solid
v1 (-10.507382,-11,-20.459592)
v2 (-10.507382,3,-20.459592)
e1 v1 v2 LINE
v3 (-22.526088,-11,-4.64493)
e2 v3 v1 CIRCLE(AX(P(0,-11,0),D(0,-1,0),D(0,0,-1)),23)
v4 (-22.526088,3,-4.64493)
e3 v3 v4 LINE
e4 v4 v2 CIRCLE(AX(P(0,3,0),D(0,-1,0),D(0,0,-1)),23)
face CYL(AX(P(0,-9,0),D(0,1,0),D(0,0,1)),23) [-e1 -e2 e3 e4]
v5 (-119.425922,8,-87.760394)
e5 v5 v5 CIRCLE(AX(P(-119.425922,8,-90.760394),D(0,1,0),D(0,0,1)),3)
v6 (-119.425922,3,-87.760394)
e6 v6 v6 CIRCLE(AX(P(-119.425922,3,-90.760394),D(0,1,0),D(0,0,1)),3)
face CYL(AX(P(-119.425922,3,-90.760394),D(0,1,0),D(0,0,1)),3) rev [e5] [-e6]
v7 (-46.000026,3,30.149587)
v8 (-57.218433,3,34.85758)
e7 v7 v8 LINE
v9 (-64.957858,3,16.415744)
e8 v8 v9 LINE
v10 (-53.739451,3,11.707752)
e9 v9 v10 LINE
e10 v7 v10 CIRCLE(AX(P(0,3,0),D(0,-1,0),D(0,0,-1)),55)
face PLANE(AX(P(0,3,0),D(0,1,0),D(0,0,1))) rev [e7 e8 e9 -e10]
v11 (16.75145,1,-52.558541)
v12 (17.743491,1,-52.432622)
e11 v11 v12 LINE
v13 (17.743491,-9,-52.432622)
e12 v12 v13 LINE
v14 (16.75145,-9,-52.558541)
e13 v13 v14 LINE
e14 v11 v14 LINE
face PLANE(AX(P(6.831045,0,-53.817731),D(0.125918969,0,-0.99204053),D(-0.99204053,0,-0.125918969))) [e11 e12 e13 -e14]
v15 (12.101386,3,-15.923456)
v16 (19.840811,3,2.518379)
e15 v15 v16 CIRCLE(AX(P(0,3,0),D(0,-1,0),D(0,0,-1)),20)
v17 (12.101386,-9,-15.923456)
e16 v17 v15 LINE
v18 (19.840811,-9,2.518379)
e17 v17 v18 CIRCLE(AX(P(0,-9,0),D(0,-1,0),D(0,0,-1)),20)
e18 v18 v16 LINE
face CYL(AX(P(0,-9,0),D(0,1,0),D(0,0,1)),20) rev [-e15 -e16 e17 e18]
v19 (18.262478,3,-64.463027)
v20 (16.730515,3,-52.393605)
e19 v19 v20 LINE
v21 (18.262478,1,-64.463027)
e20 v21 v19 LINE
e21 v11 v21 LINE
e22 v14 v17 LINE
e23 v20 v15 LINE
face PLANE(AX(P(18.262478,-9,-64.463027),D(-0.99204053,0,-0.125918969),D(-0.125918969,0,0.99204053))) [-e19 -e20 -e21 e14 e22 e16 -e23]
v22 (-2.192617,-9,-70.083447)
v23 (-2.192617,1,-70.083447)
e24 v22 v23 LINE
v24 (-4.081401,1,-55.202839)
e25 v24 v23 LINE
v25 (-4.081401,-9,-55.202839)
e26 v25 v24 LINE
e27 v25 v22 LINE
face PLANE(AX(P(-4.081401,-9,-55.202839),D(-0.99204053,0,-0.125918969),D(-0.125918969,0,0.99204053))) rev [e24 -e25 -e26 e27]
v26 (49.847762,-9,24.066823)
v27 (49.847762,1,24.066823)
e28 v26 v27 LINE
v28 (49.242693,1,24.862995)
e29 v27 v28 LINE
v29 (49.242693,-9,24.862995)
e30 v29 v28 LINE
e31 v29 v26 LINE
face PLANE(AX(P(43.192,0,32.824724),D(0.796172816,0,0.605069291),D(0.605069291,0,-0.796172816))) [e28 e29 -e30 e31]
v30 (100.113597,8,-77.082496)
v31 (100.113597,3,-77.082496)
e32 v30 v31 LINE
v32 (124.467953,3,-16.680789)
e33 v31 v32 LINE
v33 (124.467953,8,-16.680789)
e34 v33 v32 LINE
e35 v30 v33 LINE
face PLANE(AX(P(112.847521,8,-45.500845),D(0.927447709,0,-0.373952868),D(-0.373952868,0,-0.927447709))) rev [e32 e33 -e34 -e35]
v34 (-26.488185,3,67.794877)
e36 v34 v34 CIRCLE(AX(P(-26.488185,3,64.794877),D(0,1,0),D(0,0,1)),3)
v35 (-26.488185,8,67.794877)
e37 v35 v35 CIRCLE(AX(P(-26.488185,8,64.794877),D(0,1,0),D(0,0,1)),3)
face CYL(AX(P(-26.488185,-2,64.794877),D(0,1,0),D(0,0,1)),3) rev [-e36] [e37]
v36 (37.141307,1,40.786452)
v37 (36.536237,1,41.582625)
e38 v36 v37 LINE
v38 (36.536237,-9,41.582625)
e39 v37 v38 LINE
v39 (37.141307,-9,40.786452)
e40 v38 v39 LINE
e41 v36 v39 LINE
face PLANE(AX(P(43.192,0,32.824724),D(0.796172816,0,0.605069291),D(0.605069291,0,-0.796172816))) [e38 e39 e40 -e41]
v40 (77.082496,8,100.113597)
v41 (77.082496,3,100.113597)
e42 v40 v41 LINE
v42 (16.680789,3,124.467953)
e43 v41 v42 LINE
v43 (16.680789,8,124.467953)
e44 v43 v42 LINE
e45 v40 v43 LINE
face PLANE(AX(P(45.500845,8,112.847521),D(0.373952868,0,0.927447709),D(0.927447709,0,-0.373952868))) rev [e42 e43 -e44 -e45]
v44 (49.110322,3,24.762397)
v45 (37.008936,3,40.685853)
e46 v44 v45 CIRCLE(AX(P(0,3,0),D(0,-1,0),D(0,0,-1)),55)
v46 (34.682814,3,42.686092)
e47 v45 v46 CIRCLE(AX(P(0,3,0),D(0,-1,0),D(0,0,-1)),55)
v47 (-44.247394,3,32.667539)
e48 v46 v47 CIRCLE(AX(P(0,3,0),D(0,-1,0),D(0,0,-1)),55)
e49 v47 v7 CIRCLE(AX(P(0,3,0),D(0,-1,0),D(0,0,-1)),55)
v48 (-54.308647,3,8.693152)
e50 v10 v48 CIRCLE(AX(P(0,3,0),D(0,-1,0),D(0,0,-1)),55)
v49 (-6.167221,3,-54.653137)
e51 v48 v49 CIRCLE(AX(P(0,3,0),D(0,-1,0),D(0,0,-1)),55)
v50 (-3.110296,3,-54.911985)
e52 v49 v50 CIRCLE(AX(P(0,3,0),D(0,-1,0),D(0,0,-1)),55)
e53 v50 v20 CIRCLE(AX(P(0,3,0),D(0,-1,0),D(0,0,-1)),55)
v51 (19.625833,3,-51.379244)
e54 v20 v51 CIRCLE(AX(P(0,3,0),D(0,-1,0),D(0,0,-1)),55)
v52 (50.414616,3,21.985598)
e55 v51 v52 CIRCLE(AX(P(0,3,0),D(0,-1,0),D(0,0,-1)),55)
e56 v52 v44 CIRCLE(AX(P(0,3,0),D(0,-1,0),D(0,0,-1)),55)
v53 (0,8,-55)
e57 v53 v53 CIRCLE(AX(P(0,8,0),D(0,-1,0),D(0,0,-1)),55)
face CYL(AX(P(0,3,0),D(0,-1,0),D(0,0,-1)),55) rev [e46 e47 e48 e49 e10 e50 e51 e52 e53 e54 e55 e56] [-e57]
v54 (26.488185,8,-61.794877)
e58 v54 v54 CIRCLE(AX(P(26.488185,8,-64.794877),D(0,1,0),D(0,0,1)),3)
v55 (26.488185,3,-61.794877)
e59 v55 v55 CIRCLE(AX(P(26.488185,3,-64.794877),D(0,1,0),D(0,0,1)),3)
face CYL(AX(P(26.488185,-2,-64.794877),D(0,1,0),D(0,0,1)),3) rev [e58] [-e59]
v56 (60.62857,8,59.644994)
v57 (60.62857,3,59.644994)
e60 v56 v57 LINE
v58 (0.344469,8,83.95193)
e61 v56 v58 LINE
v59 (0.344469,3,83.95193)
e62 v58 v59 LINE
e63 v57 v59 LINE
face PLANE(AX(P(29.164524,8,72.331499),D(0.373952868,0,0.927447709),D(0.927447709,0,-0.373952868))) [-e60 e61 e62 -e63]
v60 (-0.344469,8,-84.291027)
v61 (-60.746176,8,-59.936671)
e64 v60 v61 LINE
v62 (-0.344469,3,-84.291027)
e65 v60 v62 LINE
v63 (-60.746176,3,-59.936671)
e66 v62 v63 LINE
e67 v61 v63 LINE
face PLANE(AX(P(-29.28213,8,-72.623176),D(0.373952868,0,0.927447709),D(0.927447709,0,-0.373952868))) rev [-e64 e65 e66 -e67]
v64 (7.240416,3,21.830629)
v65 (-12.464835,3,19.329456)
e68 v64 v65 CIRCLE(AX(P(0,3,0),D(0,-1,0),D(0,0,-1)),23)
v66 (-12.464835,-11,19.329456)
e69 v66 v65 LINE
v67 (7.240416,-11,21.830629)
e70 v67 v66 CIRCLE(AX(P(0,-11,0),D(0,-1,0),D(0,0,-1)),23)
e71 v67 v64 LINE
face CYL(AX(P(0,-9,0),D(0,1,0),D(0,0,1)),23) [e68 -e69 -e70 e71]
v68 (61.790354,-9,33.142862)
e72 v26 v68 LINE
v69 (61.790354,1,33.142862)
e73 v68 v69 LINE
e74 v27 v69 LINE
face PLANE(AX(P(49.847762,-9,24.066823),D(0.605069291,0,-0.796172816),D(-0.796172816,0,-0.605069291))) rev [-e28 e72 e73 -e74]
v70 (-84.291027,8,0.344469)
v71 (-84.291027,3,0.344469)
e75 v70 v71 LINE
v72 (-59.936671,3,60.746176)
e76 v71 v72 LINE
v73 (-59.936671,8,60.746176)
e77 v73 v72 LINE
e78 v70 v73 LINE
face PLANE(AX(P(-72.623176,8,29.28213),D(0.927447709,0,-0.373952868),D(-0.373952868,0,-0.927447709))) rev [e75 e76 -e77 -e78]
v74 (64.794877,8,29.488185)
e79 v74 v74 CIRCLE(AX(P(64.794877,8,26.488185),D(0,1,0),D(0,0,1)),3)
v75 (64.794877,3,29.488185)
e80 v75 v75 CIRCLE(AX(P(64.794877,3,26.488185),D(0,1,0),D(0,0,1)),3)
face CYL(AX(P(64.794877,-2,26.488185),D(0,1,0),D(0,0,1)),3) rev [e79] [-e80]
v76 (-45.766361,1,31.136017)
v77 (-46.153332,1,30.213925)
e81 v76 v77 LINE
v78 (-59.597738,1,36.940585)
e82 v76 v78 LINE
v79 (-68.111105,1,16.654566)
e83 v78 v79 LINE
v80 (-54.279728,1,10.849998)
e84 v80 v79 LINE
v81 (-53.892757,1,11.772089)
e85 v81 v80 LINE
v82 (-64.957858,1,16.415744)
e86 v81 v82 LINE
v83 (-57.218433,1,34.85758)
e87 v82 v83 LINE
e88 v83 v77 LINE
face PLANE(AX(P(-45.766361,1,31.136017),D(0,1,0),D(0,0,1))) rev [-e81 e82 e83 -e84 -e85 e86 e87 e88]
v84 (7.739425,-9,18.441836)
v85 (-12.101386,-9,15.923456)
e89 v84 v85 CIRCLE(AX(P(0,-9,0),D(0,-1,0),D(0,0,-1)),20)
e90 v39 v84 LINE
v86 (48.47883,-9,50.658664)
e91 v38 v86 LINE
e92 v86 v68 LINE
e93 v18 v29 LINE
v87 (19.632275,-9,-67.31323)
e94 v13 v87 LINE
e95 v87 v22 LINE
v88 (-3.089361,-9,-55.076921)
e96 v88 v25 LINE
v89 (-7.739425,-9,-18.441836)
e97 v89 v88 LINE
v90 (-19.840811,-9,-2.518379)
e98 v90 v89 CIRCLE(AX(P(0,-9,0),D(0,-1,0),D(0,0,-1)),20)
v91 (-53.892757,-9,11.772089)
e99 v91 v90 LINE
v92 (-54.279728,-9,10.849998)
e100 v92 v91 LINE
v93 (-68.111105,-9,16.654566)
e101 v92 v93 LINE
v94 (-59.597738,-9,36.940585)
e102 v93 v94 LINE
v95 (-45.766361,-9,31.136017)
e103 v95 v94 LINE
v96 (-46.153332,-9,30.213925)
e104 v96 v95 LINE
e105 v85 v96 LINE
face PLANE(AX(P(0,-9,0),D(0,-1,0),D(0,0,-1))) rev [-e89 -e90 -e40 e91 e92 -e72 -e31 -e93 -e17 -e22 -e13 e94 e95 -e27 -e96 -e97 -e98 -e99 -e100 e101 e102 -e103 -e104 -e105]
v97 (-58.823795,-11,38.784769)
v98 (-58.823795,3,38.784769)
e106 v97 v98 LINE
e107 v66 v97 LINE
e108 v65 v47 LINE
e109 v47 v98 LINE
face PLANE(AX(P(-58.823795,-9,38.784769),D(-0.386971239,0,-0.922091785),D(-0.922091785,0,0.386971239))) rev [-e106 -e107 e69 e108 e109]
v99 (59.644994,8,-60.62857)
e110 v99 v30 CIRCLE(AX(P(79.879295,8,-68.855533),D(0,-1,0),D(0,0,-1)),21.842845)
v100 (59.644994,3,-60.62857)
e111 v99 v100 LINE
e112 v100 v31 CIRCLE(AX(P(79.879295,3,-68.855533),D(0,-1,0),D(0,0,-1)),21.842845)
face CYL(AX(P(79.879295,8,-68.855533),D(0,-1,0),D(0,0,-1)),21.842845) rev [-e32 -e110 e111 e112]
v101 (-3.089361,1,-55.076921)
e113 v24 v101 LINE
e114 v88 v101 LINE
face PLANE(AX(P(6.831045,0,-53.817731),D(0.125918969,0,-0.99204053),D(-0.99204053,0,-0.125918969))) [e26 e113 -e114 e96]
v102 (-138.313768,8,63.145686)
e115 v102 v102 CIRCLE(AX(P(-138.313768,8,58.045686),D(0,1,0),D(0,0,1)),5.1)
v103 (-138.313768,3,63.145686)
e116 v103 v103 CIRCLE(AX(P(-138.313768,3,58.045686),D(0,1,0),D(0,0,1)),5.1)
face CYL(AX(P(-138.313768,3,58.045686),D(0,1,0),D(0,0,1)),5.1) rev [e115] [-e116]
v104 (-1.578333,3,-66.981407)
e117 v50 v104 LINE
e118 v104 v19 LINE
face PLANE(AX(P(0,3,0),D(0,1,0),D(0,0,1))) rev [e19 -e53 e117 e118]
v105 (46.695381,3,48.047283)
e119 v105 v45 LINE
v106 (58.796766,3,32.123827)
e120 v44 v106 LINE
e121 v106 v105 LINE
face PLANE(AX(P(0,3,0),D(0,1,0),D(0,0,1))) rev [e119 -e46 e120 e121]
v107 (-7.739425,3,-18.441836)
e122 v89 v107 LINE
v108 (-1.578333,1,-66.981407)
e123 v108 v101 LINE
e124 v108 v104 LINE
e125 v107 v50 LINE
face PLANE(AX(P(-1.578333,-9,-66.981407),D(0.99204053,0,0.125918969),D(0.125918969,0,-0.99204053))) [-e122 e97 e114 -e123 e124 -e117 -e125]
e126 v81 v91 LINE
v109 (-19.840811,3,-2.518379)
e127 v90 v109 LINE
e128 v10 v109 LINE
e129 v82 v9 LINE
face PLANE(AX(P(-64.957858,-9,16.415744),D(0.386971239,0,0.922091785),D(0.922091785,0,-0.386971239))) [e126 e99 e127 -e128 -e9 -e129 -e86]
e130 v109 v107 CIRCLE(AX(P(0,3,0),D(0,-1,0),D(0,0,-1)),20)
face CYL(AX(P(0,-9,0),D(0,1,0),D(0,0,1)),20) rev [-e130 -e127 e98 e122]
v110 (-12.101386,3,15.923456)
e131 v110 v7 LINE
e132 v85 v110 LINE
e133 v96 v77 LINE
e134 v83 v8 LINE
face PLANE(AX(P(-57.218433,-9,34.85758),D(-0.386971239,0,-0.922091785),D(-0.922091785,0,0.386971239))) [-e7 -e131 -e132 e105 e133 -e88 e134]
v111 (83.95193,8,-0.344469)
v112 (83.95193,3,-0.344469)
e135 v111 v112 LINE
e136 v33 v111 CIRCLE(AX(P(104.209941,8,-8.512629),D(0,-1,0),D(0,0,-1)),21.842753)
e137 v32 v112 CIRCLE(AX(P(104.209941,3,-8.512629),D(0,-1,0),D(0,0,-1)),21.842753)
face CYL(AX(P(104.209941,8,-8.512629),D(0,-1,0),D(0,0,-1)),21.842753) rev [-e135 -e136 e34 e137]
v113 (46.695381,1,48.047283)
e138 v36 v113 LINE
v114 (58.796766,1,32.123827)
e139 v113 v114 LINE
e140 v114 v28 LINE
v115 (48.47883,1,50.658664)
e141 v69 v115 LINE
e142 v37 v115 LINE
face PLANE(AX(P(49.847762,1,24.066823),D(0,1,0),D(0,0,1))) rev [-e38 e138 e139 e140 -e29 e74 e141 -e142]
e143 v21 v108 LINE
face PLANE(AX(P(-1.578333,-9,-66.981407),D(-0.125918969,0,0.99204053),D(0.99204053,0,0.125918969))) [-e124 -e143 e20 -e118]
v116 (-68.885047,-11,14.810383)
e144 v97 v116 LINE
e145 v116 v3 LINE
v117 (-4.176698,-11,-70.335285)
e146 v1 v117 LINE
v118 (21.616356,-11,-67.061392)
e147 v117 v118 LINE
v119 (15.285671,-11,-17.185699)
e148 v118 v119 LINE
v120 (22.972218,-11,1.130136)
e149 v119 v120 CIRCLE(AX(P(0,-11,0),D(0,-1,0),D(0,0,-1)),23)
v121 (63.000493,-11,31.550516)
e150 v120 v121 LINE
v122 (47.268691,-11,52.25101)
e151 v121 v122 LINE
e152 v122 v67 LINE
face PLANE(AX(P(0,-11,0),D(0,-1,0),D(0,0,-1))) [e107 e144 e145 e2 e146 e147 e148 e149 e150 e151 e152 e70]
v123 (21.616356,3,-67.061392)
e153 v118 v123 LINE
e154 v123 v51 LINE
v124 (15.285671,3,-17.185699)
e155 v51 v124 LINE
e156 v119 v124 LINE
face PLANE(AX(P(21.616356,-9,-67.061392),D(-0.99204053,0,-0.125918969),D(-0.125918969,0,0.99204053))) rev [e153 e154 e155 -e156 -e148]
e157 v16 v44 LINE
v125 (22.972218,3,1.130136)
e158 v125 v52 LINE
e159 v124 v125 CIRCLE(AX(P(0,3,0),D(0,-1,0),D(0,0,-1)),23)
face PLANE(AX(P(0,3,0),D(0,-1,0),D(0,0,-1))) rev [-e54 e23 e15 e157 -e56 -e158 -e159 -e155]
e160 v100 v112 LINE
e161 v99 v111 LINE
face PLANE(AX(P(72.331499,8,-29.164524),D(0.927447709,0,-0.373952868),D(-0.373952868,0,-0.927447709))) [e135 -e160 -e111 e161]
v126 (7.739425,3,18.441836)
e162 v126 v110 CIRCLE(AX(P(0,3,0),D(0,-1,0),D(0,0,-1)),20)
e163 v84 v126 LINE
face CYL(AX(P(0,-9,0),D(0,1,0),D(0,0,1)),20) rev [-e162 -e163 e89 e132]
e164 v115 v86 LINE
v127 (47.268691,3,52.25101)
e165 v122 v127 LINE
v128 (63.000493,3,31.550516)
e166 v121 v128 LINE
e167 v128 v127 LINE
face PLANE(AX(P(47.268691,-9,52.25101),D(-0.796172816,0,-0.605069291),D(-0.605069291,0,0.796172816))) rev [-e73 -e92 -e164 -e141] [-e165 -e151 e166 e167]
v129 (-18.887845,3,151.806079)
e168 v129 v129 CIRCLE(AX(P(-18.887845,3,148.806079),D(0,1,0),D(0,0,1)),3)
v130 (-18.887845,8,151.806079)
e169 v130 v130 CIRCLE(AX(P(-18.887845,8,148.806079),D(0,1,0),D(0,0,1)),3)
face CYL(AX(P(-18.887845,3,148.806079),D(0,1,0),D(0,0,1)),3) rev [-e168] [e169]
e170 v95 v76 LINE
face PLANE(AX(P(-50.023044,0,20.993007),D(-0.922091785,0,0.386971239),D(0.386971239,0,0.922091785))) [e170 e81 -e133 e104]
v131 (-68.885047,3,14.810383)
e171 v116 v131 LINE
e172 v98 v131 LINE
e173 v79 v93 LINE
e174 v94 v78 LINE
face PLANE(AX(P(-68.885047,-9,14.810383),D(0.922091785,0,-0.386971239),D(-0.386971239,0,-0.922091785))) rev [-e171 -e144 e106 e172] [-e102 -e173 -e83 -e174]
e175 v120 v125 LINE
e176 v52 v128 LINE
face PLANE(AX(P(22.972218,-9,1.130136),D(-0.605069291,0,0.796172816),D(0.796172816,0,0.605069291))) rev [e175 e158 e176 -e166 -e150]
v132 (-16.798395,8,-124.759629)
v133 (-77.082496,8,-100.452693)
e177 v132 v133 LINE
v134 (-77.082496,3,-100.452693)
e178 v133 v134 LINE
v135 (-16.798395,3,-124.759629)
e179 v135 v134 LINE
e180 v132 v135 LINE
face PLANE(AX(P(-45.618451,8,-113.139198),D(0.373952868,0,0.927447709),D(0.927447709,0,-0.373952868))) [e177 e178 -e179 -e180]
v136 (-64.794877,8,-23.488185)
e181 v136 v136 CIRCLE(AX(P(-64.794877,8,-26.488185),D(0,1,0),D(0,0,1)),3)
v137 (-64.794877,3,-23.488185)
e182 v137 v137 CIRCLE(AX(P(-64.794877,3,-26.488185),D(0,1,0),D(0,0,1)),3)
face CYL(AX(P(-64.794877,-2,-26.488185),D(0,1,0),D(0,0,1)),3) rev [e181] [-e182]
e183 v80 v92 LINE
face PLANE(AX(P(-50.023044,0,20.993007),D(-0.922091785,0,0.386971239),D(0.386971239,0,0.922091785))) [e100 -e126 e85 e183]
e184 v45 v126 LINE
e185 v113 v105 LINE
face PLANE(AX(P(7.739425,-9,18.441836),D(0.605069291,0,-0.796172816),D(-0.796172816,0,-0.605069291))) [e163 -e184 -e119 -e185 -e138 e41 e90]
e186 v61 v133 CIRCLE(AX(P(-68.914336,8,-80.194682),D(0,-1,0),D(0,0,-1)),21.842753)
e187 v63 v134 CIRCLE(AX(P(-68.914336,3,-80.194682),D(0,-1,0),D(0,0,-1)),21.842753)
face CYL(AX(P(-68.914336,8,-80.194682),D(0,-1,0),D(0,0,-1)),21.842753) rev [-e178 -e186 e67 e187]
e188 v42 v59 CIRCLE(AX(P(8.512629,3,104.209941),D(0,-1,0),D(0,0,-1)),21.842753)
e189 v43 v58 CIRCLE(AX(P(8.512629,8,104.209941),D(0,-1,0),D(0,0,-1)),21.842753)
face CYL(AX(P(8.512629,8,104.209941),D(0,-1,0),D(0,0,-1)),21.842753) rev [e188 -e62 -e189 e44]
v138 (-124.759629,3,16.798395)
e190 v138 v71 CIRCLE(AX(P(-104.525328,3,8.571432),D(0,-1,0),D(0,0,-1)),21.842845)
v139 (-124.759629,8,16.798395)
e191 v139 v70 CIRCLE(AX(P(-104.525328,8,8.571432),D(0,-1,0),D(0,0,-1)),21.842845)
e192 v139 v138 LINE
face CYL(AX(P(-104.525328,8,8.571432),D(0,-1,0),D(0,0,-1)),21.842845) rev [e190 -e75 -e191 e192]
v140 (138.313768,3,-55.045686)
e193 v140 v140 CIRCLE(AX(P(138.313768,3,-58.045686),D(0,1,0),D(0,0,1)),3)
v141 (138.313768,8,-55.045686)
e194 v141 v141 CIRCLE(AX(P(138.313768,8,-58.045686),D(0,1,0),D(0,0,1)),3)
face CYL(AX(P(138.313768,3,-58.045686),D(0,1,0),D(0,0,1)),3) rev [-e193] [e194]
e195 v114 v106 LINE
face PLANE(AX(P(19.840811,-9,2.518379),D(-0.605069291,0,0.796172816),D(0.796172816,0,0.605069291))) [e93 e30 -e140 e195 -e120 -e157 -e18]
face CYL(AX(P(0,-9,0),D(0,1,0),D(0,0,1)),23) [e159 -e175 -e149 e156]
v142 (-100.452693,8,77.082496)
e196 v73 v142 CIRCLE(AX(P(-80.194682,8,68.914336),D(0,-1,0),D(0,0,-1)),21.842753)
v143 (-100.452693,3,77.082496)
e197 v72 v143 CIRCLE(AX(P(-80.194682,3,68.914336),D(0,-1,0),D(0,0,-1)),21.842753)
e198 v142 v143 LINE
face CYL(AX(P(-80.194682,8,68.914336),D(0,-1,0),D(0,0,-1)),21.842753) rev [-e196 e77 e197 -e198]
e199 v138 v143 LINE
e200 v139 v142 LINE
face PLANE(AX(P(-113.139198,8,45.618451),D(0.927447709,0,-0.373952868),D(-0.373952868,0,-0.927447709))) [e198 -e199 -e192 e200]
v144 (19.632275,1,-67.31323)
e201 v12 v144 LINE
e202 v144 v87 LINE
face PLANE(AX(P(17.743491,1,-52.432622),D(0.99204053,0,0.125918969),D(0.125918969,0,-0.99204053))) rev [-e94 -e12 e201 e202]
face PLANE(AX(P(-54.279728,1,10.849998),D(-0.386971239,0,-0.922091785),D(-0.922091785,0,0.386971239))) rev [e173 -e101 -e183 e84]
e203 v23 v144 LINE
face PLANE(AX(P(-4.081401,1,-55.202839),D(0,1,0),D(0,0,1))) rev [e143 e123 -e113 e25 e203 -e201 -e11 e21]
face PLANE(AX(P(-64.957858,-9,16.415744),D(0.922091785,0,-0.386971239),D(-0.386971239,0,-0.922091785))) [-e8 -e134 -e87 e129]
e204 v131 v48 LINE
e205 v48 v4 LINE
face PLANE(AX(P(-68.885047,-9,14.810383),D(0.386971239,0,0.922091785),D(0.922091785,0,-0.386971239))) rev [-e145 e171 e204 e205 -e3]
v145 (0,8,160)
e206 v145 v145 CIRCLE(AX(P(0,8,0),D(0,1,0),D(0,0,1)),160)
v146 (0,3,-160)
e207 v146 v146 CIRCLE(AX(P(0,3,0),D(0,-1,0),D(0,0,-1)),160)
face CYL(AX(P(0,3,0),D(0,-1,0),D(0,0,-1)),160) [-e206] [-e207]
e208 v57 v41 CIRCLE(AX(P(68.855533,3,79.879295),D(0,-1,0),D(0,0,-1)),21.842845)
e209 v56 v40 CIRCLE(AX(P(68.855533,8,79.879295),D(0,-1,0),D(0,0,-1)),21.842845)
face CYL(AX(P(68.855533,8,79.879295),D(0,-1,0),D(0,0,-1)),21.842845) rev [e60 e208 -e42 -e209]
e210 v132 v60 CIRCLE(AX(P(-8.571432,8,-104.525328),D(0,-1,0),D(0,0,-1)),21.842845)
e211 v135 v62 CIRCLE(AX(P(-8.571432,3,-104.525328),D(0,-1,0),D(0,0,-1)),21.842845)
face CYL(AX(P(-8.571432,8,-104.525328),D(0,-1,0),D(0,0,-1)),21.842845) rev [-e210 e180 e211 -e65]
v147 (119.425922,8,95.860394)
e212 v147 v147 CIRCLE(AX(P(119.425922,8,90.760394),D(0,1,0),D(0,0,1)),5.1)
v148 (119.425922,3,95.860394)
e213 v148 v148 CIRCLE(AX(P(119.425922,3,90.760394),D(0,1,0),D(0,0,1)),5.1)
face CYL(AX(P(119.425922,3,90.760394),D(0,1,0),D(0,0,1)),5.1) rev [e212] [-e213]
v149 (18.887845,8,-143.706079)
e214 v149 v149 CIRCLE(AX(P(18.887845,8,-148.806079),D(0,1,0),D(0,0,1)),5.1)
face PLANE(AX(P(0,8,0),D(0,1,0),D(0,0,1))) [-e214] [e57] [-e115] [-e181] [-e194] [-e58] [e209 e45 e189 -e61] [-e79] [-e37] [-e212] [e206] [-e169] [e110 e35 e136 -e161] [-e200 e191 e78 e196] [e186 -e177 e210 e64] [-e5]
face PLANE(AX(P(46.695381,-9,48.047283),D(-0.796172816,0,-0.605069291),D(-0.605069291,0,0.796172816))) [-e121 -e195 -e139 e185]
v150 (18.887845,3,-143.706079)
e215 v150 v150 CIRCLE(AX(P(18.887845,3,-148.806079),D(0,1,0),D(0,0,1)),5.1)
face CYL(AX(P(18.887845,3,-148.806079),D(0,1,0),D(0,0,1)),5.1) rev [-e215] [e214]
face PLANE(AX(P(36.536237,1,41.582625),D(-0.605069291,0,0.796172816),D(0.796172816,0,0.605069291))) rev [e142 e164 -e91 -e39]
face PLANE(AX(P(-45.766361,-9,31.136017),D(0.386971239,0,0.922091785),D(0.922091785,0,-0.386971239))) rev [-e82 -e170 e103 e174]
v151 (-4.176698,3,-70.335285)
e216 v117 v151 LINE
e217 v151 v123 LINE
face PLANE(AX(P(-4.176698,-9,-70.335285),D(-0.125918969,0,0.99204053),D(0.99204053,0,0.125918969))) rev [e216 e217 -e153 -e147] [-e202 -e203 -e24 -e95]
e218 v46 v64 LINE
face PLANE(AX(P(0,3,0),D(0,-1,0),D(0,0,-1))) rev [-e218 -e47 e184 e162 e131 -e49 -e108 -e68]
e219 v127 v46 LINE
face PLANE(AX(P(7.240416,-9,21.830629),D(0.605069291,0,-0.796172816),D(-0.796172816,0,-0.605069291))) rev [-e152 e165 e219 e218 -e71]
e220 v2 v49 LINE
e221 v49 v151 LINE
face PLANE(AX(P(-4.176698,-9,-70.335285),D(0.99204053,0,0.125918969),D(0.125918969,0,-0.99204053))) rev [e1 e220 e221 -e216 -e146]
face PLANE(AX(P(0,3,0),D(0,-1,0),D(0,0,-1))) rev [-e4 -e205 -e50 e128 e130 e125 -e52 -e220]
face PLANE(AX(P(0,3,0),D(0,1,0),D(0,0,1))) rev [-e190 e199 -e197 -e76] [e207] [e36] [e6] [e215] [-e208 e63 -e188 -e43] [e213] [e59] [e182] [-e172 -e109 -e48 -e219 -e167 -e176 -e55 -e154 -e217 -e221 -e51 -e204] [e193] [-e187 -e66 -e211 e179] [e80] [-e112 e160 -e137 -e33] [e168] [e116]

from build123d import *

# Parameters (mm, degrees)
SKETCH1_R           = 160
SKETCH1_R_2         = 55
BOSS_EXTRUDE1_DEPTH = 3
SKETCH2_R           = 2.5
CUT_EXTRUDE1_DEPTH  = 5
CIRPATTERN1_COUNT   = 4
SKETCH3_R           = 5.1
CUT_EXTRUDE3_DEPTH  = 227.294056484
CIRPATTERN2_COUNT   = 3
CUT_EXTRUDE4_DEPTH  = 227.294056484
CIRPATTERN3_COUNT   = 4
SKETCH5_R           = 160
BOSS_EXTRUDE2_DEPTH = 5
SKETCH6_R           = 5.1
CUT_EXTRUDE5_DEPTH  = 5
SKETCH7_R           = 5.1
CUT_EXTRUDE6_DEPTH  = 5
SKETCH8_R           = 5.1
CUT_EXTRUDE7_DEPTH  = 5
CUT_EXTRUDE8_START  = -5
SKETCH9_R           = 2.5
CUT_EXTRUDE8_DEPTH  = 5
CUT_EXTRUDE9_START  = -5
SKETCH10_R          = 2.5
CUT_EXTRUDE9_DEPTH  = 5
CUT_EXTRUDE10_START = -5
SKETCH11_R          = 2.5
CUT_EXTRUDE10_DEPTH = 5
CUT_EXTRUDE11_START = -5
SKETCH12_R          = 2.5
CUT_EXTRUDE11_DEPTH = 5
SKETCH13_R          = 55
CUT_EXTRUDE12_DEPTH = 5
CUT_EXTRUDE15_DEPTH = 5
SKETCH15_R          = 160
CUT_EXTRUDE16_DEPTH = 3
BOSS_EXTRUDE4_DEPTH = 14
SKETCH20_R          = 18
CUT_EXTRUDE19_DEPTH = 13
CUT_EXTRUDE21_DEPTH = 14
CUT_EXTRUDE24_START = -14
CUT_EXTRUDE24_DEPTH = 14
CUT_EXTRUDE22_START = -5
SKETCH23_R          = 5.1
CUT_EXTRUDE22_DEPTH = 5
SKETCH24_R          = 3
CUT_EXTRUDE23_DEPTH = 10
BOSS_EXTRUDE6_START = -5
SKETCH25_R          = 5.1
SKETCH25_R_2        = 3
BOSS_EXTRUDE6_DEPTH = 5
BOSS_EXTRUDE7_DEPTH = 12
BOSS_EXTRUDE8_DEPTH = 2
SKETCH28_W          = 22
SKETCH28_H          = 10
CUT_EXTRUDE25_DEPTH = 15
SKETCH29_W          = 22
SKETCH29_H          = 10
CUT_EXTRUDE26_DEPTH = 15
SKETCH30_W          = 22
SKETCH30_H          = 10
CUT_EXTRUDE27_DEPTH = 15


# Read off the part's stored shape, not the designer's step: Cut-Extrude24
with BuildPart() as part:
    # Sketch1 → Boss-Extrude1 (new body)
    with BuildSketch(Plane(origin=(0, 0, 0), x_dir=(1, 0, 0), z_dir=(0, 1, 0))):
        with Locations(Location((0, 0, 0), (0, 0, 270))):
            Circle(SKETCH1_R)
        with Locations(Location((0, 0, 0), (0, 0, 270))):
            Circle(SKETCH1_R_2, mode=Mode.SUBTRACT)
    extrude(amount=BOSS_EXTRUDE1_DEPTH)

    # Sketch2 → Cut-Extrude1 (cut)
    with BuildSketch(Plane(origin=(0, 3, 0), x_dir=(1, 0, 0), z_dir=(0, 1, 0))):
        with Locations(Location((64.794876894, -26.488184691, 0), (0, 0, 270))):
            Circle(SKETCH2_R)
    cut_extrude1 = extrude(amount=-CUT_EXTRUDE1_DEPTH, mode=Mode.SUBTRACT)

    # CirPattern1: Cut-Extrude1 ×4 about axis
    cirpattern1_axis = Axis((0, 0, 0), (0, 1, 0))
    for i in range(1, CIRPATTERN1_COUNT):
        add(cut_extrude1.rotate(cirpattern1_axis, i * 360 / CIRPATTERN1_COUNT), mode=Mode.SUBTRACT)

    # Sketch3 → Cut-Extrude3 (cut, through all)
    with BuildSketch(Plane.XZ):
        with Locations(Location((138.31376779, -58.045685797, 0), (0, 0, 270))):
            Circle(SKETCH3_R)
    cut_extrude3 = extrude(amount=-CUT_EXTRUDE3_DEPTH, mode=Mode.SUBTRACT)

    # CirPattern2: Cut-Extrude3 ×3 about axis
    cirpattern2_axis = Axis((0, 0, 0), (0, 1, 0))
    for i in range(1, CIRPATTERN2_COUNT):
        add(cut_extrude3.rotate(cirpattern2_axis, i * 360 / CIRPATTERN2_COUNT), mode=Mode.SUBTRACT)

    # Sketch4 → Cut-Extrude4 (cut, through all)
    with BuildSketch(Plane(origin=(0, 3, 0), x_dir=(1, 0, 0), z_dir=(0, 1, 0))):
        with BuildLine():
            Line((87.478831685, -99.495507551), (8.645776426, -131.281501299))
            ThreePointArc((8.645776426, -131.281501299), (-23.889237988, -117.444130267), (-10.051866955, -84.909115853))
            Line((-10.051866955, -84.909115853), (68.781188304, -53.123122105))
            ThreePointArc((68.781188304, -53.123122105), (101.316202717, -66.960493137), (87.478831685, -99.495507551))
        make_face()
    cut_extrude4 = extrude(amount=-CUT_EXTRUDE4_DEPTH, mode=Mode.SUBTRACT)

    # CirPattern3: Cut-Extrude4 ×4 about axis
    cirpattern3_axis = Axis((0, 0, 0), (0, 1, 0))
    for i in range(1, CIRPATTERN3_COUNT):
        add(cut_extrude4.rotate(cirpattern3_axis, i * 360 / CIRPATTERN3_COUNT), mode=Mode.SUBTRACT)

    # Sketch5 → Boss-Extrude2 (add)
    with BuildSketch(Plane(origin=(0, 3, 0), x_dir=(1, 0, 0), z_dir=(0, 1, 0))):
        with Locations(Location((0, 0, 0), (0, 0, 270))):
            Circle(SKETCH5_R)
    extrude(amount=BOSS_EXTRUDE2_DEPTH)

    # Sketch6 → Cut-Extrude5 (cut)
    with BuildSketch(Plane(origin=(0, 3, 0), x_dir=(-1, 0, 0), z_dir=(0, -1, 0))):
        with Locations(Location((-138.31376779, 58.045685797, 0), (0, 0, 90))):
            Circle(SKETCH6_R)
    extrude(amount=-CUT_EXTRUDE5_DEPTH, mode=Mode.SUBTRACT)

    # Sketch7 → Cut-Extrude6 (cut)
    with BuildSketch(Plane(origin=(0, 3, 0), x_dir=(-1, 0, 0), z_dir=(0, -1, 0))):
        with Locations(Location((119.425922375, 90.760393701, 0), (0, 0, 330))):
            Circle(SKETCH7_R)
    extrude(amount=-CUT_EXTRUDE6_DEPTH, mode=Mode.SUBTRACT)

    # Sketch8 → Cut-Extrude7 (cut)
    with BuildSketch(Plane(origin=(0, 3, 0), x_dir=(-1, 0, 0), z_dir=(0, -1, 0))):
        with Locations(Location((18.887845415, -148.806079498, 0), (0, 0, 210))):
            Circle(SKETCH8_R)
    extrude(amount=-CUT_EXTRUDE7_DEPTH, mode=Mode.SUBTRACT)

    # Sketch9 → Cut-Extrude8 (cut)
    with BuildSketch(Plane(origin=(0, 3, 0), x_dir=(-1, 0, 0), z_dir=(0, -1, 0)).offset(CUT_EXTRUDE8_START)):
        with Locations(Location((26.488184691, -64.794876894, 0), (0, 0, 270))):
            Circle(SKETCH9_R)
    extrude(amount=CUT_EXTRUDE8_DEPTH, mode=Mode.SUBTRACT)

    # Sketch10 → Cut-Extrude9 (cut)
    with BuildSketch(Plane(origin=(0, 3, 0), x_dir=(-1, 0, 0), z_dir=(0, -1, 0)).offset(CUT_EXTRUDE9_START)):
        with Locations(Location((-64.794876894, -26.488184691, 0), (0, 0, 270))):
            Circle(SKETCH10_R)
    extrude(amount=CUT_EXTRUDE9_DEPTH, mode=Mode.SUBTRACT)

    # Sketch11 → Cut-Extrude10 (cut)
    with BuildSketch(Plane(origin=(0, 3, 0), x_dir=(-1, 0, 0), z_dir=(0, -1, 0)).offset(CUT_EXTRUDE10_START)):
        with Locations(Location((64.794876894, 26.488184691, 0), (0, 0, 270))):
            Circle(SKETCH11_R)
    extrude(amount=CUT_EXTRUDE10_DEPTH, mode=Mode.SUBTRACT)

    # Sketch12 → Cut-Extrude11 (cut)
    with BuildSketch(Plane(origin=(0, 3, 0), x_dir=(-1, 0, 0), z_dir=(0, -1, 0)).offset(CUT_EXTRUDE11_START)):
        with Locations(Location((-26.488184691, 64.794876894, 0), (0, 0, 270))):
            Circle(SKETCH12_R)
    extrude(amount=CUT_EXTRUDE11_DEPTH, mode=Mode.SUBTRACT)

    # Sketch13 → Cut-Extrude12 (cut)
    with BuildSketch(Plane(origin=(0, 3, 0), x_dir=(-1, 0, 0), z_dir=(0, -1, 0))):
        with Locations(Location((0, 0, 0), (0, 0, 90))):
            Circle(SKETCH13_R)
    extrude(amount=-CUT_EXTRUDE12_DEPTH, mode=Mode.SUBTRACT)

    # Sketch14 → Cut-Extrude15 (cut)
    with BuildSketch(Plane(origin=(0, 3, 0), x_dir=(-1, 0, 0), z_dir=(0, -1, 0))):
        with BuildLine():
            ThreePointArc((-60.628569817, -59.644993908), (-89.089834339, -71.652332254), (-77.082495993, -100.113596776))
            Line((-77.082495993, -100.113596776), (-76.964890019, -100.161016259))
            Line((-76.964890019, -100.161016259), (-46.822839479, -112.314484457))
            Line((-46.822839479, -112.314484457), (-16.680788939, -124.467952655))
            ThreePointArc((-16.680788939, -124.467952655), (11.745382338, -112.37810158), (-0.344468737, -83.951930304))
            Line((-0.344468737, -83.951930304), (-30.486519277, -71.798462106))
            Line((-30.486519277, -71.798462106), (-60.628569817, -59.644993908))
        make_face()
        with BuildLine():
            ThreePointArc((124.759629496, -16.798394913), (112.75229115, 11.662869609), (84.291026628, -0.344468737))
            Line((84.291026628, -0.344468737), (84.243607145, -0.462074711))
            Line((84.243607145, -0.462074711), (59.936670749, -60.746175791))
            ThreePointArc((59.936670749, -60.746175791), (72.026521824, -89.172347068), (100.4526931, -77.082495993))
            Line((100.4526931, -77.082495993), (112.606161298, -46.940445453))
            Line((112.606161298, -46.940445453), (124.759629496, -16.798394913))
        make_face()
        with BuildLine():
            Line((-71.798462106, 30.486519277), (-59.644993908, 60.628569817))
            ThreePointArc((-59.644993908, 60.628569817), (-71.652332254, 89.089834339), (-100.113596776, 77.082495993))
            Line((-100.113596776, 77.082495993), (-100.161016259, 76.964890019))
            Line((-100.161016259, 76.964890019), (-112.314484457, 46.822839479))
            Line((-112.314484457, 46.822839479), (-124.467952655, 16.680788939))
            ThreePointArc((-124.467952655, 16.680788939), (-112.37810158, -11.745382338), (-83.951930304, 0.344468737))
            Line((-83.951930304, 0.344468737), (-71.798462106, 30.486519277))
        make_face()
        with BuildLine():
            Line((46.940445453, 112.606161298), (16.798394913, 124.759629496))
            ThreePointArc((16.798394913, 124.759629496), (-11.662869609, 112.75229115), (0.344468737, 84.291026628))
            Line((0.344468737, 84.291026628), (0.462074711, 84.243607145))
            Line((0.462074711, 84.243607145), (60.746175791, 59.936670749))
            ThreePointArc((60.746175791, 59.936670749), (89.172347068, 72.026521824), (77.082495993, 100.4526931))
            Line((77.082495993, 100.4526931), (46.940445453, 112.606161298))
        make_face()
    extrude(amount=-CUT_EXTRUDE15_DEPTH, mode=Mode.SUBTRACT)

    # Sketch15 → Cut-Extrude16 (cut)
    with BuildSketch(Plane.XZ):
        with Locations(Location((0, 0, 0), (0, 0, 270))):
            Circle(SKETCH15_R)
    extrude(amount=-CUT_EXTRUDE16_DEPTH, mode=Mode.SUBTRACT)

    # Sketch16 → Boss-Extrude4 (add)
    with BuildSketch(Plane(origin=(0, 3, 0), x_dir=(-1, 0, 0), z_dir=(0, -1, 0))):
        with BuildLine():
            Line((-65.945399863, 16.830182544), (-58.20597509, 35.272018249))
            Line((-58.20597509, 35.272018249), (-12.101385827, 15.923456317))
            ThreePointArc((-12.101385827, 15.923456317), (-2.518379389, 19.8408106), (7.739424773, 18.441835705))
            Line((7.739424773, 18.441835705), (47.548065565, 48.695300272))
            Line((47.548065565, 48.695300272), (59.649451391, 32.771843956))
            Line((59.649451391, 32.771843956), (19.8408106, 2.518379389))
            ThreePointArc((19.8408106, 2.518379389), (18.441835705, -7.739424773), (12.101385827, -15.923456317))
            Line((12.101385827, -15.923456317), (18.397334299, -65.525482816))
            Line((18.397334299, -65.525482816), (-1.443476301, -68.043862205))
            Line((-1.443476301, -68.043862205), (-7.739424773, -18.441835705))
            ThreePointArc((-7.739424773, -18.441835705), (-15.923456317, -12.101385827), (-19.8408106, -2.518379389))
            Line((-19.8408106, -2.518379389), (-65.945399863, 16.830182544))
        make_face()
    extrude(amount=BOSS_EXTRUDE4_DEPTH)

    # Sketch20 → Cut-Extrude19 (cut)
    with BuildSketch(Plane(origin=(0, 3, 0), x_dir=(1, 0, 0), z_dir=(0, 1, 0))):
        with Locations(Location((0, 0, 0), (0, 0, 270))):
            Circle(SKETCH20_R)
    extrude(amount=-CUT_EXTRUDE19_DEPTH, mode=Mode.SUBTRACT)

    # Sketch21 → Cut-Extrude21 (cut)
    with BuildSketch(Plane.XZ.offset(11)):
        Polygon((-48.153134856, -47.899127457), (-59.0443821, -33.568016772), (-9.582658928, 4.021523078), (-17.405293769, 65.651401785), (0.451435771, 67.917943235), (8.274070612, 6.288064528), (65.558428625, -17.752274329), (58.592946329, -34.349926464), (1.308588316, -10.309587607), align=None)
    extrude(amount=-CUT_EXTRUDE21_DEPTH, mode=Mode.SUBTRACT)

    # Cut-Extrude24 outline → Cut-Extrude24 (cut)
    with BuildSketch(Plane(origin=(0, -11, 0), x_dir=(-1, 0, 0), z_dir=(0, -1, 0)).offset(CUT_EXTRUDE24_START)):
        with BuildLine():
            Line((17.405293769, -65.651401785), (18.397334299, -65.525482816))
            Line((18.397334299, -65.525482816), (12.101385827, -15.923456317))
            ThreePointArc((12.101385827, -15.923456317), (18.441835705, -7.739424773), (19.8408106, 2.518379389))
            Line((19.8408106, 2.518379389), (59.649451391, 32.771843956))
            Line((59.649451391, 32.771843956), (59.0443821, 33.568016772))
            Line((59.0443821, 33.568016772), (9.582658928, -4.021523078))
            Line((9.582658928, -4.021523078), (17.405293769, -65.651401785))
        make_face()
        with BuildLine():
            Line((-1.443476301, -68.043862205), (-0.451435771, -67.917943235))
            Line((-0.451435771, -67.917943235), (-8.274070612, -6.288064528))
            Line((-8.274070612, -6.288064528), (-65.558428625, 17.752274329))
            Line((-65.558428625, 17.752274329), (-65.945399863, 16.830182544))
            Line((-65.945399863, 16.830182544), (-19.8408106, -2.518379389))
            ThreePointArc((-19.8408106, -2.518379389), (-15.923456317, -12.101385827), (-7.739424773, -18.441835705))
            Line((-7.739424773, -18.441835705), (-1.443476301, -68.043862205))
        make_face()
        with BuildLine():
            Line((48.153134856, 47.899127457), (47.548065565, 48.695300272))
            Line((47.548065565, 48.695300272), (7.739424773, 18.441835705))
            ThreePointArc((7.739424773, 18.441835705), (-2.518379389, 19.8408106), (-12.101385827, 15.923456317))
            Line((-12.101385827, 15.923456317), (-58.20597509, 35.272018249))
            Line((-58.20597509, 35.272018249), (-58.592946329, 34.349926464))
            Line((-58.592946329, 34.349926464), (-1.308588316, 10.309587607))
            Line((-1.308588316, 10.309587607), (48.153134856, 47.899127457))
        make_face()
    extrude(amount=CUT_EXTRUDE24_DEPTH, mode=Mode.SUBTRACT)

    # Sketch23 → Cut-Extrude22 (cut)
    with BuildSketch(Plane(origin=(0, 8, 0), x_dir=(1, 0, 0), z_dir=(0, 1, 0)).offset(CUT_EXTRUDE22_START)):
        with Locations(Location((-119.425922375, 90.760393701, 0), (0, 0, 90))):
            Circle(SKETCH23_R)
        with Locations(Location((138.31376779, 58.045685797, 0), (0, 0, 90))):
            Circle(SKETCH23_R)
        with Locations(Location((-18.887845415, -148.806079498, 0), (0, 0, 90))):
            Circle(SKETCH23_R)
        with Locations(Location((-138.31376779, -58.045685797, 0), (0, 0, 270))):
            Circle(SKETCH23_R)
        with Locations(Location((18.887845415, 148.806079498, 0), (0, 0, 270))):
            Circle(SKETCH23_R)
        with Locations(Location((119.425922375, -90.760393701, 0), (0, 0, 270))):
            Circle(SKETCH23_R)
    extrude(amount=CUT_EXTRUDE22_DEPTH, mode=Mode.SUBTRACT)

    # Sketch24 → Cut-Extrude23 (cut)
    with BuildSketch(Plane(origin=(0, 8, 0), x_dir=(1, 0, 0), z_dir=(0, 1, 0))):
        with Locations(Location((64.794876894, -26.488184691, 0), (0, 0, 270))):
            Circle(SKETCH24_R)
        with Locations(Location((-26.488184691, -64.794876894, 0), (0, 0, 270))):
            Circle(SKETCH24_R)
        with Locations(Location((-64.794876894, 26.488184691, 0), (0, 0, 270))):
            Circle(SKETCH24_R)
        with Locations(Location((26.488184691, 64.794876894, 0), (0, 0, 270))):
            Circle(SKETCH24_R)
    extrude(amount=-CUT_EXTRUDE23_DEPTH, mode=Mode.SUBTRACT)

    # Sketch25 → Boss-Extrude6 (add)
    # profile 1 of 3: a face of its own
    with BuildSketch(Plane(origin=(0, 8, 0), x_dir=(1, 0, 0), z_dir=(0, 1, 0)).offset(BOSS_EXTRUDE6_START)):
        with Locations((-119.425922375, 90.760393701)):
            Circle(SKETCH25_R)
        with Locations(Location((-119.425922375, 90.760393701, 0), (0, 0, 270))):
            Circle(SKETCH25_R_2, mode=Mode.SUBTRACT)
    # profile 2 of 3: a face of its own
    with BuildSketch(Plane(origin=(0, 8, 0), x_dir=(1, 0, 0), z_dir=(0, 1, 0)).offset(BOSS_EXTRUDE6_START)):
        with Locations((138.31376779, 58.045685797)):
            Circle(SKETCH25_R)
        with Locations(Location((138.31376779, 58.045685797, 0), (0, 0, 270))):
            Circle(SKETCH25_R_2, mode=Mode.SUBTRACT)
    # profile 3 of 3: a face of its own
    with BuildSketch(Plane(origin=(0, 8, 0), x_dir=(1, 0, 0), z_dir=(0, 1, 0)).offset(BOSS_EXTRUDE6_START)):
        with Locations((-18.887845415, -148.806079498)):
            Circle(SKETCH25_R)
        with Locations(Location((-18.887845415, -148.806079498, 0), (0, 0, 270))):
            Circle(SKETCH25_R_2, mode=Mode.SUBTRACT)
    extrude(amount=BOSS_EXTRUDE6_DEPTH)

    # Sketch26 → Boss-Extrude7 (add)
    with BuildSketch(Plane(origin=(0, 3, 0), x_dir=(-1, 0, 0), z_dir=(0, -1, 0))):
        with BuildLine():
            Line((4.176697652, 70.335285359), (-21.616356127, 67.061392154))
            Line((-21.616356127, 67.061392154), (-15.285671354, 17.185699033))
            ThreePointArc((-15.285671354, 17.185699033), (-21.208111061, 8.900338489), (-22.972217842, -1.130136011))
            Line((-22.972217842, -1.130136011), (-63.000492729, -31.550516409))
            Line((-63.000492729, -31.550516409), (-47.268691155, -52.25100962))
            Line((-47.268691155, -52.25100962), (-7.240416267, -21.830629223))
            ThreePointArc((-7.240416267, -21.830629223), (2.896136297, -22.81693219), (12.464835417, -19.329456227))
            Line((12.464835417, -19.329456227), (58.823795077, -38.78476895))
            Line((58.823795077, -38.78476895), (68.885047282, -14.810382533))
            Line((68.885047282, -14.810382533), (22.526087621, 4.64493019))
            ThreePointArc((22.526087621, 4.64493019), (18.311974764, 13.916593701), (10.507382426, 20.459592238))
            Line((10.507382426, 20.459592238), (4.176697652, 70.335285359))
        make_face()
        with BuildLine():
            Line((64.95785821, -16.415744173), (57.218433437, -34.857579879))
            Line((57.218433437, -34.857579879), (12.101385827, -15.923456317))
            ThreePointArc((12.101385827, -15.923456317), (2.518379389, -19.8408106), (-7.739424773, -18.441835705))
            Line((-7.739424773, -18.441835705), (-46.695380581, -48.047283299))
            Line((-46.695380581, -48.047283299), (-58.796766408, -32.123826982))
            Line((-58.796766408, -32.123826982), (-19.8408106, -2.518379389))
            ThreePointArc((-19.8408106, -2.518379389), (-18.441835705, 7.739424773), (-12.101385827, 15.923456317))
            Line((-12.101385827, 15.923456317), (-18.262477629, 64.463027472))
            Line((-18.262477629, 64.463027472), (1.578332971, 66.981406861))
            Line((1.578332971, 66.981406861), (7.739424773, 18.441835705))
            ThreePointArc((7.739424773, 18.441835705), (15.923456317, 12.101385827), (19.8408106, 2.518379389))
            Line((19.8408106, 2.518379389), (64.95785821, -16.415744173))
        make_face(mode=Mode.SUBTRACT)
    extrude(amount=BOSS_EXTRUDE7_DEPTH)

    # Sketch27 → Boss-Extrude8 (add)
    with BuildSketch(Plane.XZ.offset(9)):
        with BuildLine():
            Line((-4.176697652, -70.335285359), (21.616356127, -67.061392154))
            Line((21.616356127, -67.061392154), (15.285671354, -17.185699033))
            ThreePointArc((15.285671354, -17.185699033), (21.208111061, -8.900338489), (22.972217842, 1.130136011))
            Line((22.972217842, 1.130136011), (63.000492729, 31.550516409))
            Line((63.000492729, 31.550516409), (47.268691155, 52.25100962))
            Line((47.268691155, 52.25100962), (7.240416267, 21.830629223))
            ThreePointArc((7.240416267, 21.830629223), (-2.896136297, 22.81693219), (-12.464835417, 19.329456227))
            Line((-12.464835417, 19.329456227), (-58.823795077, 38.78476895))
            Line((-58.823795077, 38.78476895), (-68.885047282, 14.810382533))
            Line((-68.885047282, 14.810382533), (-22.526087621, -4.64493019))
            ThreePointArc((-22.526087621, -4.64493019), (-18.311974764, -13.916593701), (-10.507382426, -20.459592238))
            Line((-10.507382426, -20.459592238), (-4.176697652, -70.335285359))
        make_face()
    extrude(amount=BOSS_EXTRUDE8_DEPTH)

    # Sketch28 → Cut-Extrude25 (cut)
    with BuildSketch(Plane(origin=(8.719829237, 0, -68.698338756), x_dir=(-0.9920405299868311, 0, -0.12591896943450326), z_dir=(0.12591896943450323, 0, -0.992040529986831))):
        with Locations((0, -4)):
            Rectangle(SKETCH28_W, SKETCH28_H)
    extrude(amount=-CUT_EXTRUDE25_DEPTH, mode=Mode.SUBTRACT)

    # Sketch29 → Cut-Extrude26 (cut)
    with BuildSketch(Plane(origin=(-63.854421179, 0, 26.797575742), x_dir=(0.38697123864478344, 0, 0.9220917852696239), z_dir=(-0.9220917852696239, 0, 0.38697123864478344))):
        with Locations((0, -4)):
            Rectangle(SKETCH29_W, SKETCH29_H)
    extrude(amount=-CUT_EXTRUDE26_DEPTH, mode=Mode.SUBTRACT)

    # Sketch30 → Cut-Extrude27 (cut)
    with BuildSketch(Plane(origin=(55.134591942, 0, 41.900763014), x_dir=(0.6050692913420499, 0, -0.7961728158351237), z_dir=(0.7961728158351237, 0, 0.6050692913420498))):
        with Locations((0, -4)):
            Rectangle(SKETCH30_W, SKETCH30_H)
    extrude(amount=-CUT_EXTRUDE27_DEPTH, mode=Mode.SUBTRACT)


solid = part.part
